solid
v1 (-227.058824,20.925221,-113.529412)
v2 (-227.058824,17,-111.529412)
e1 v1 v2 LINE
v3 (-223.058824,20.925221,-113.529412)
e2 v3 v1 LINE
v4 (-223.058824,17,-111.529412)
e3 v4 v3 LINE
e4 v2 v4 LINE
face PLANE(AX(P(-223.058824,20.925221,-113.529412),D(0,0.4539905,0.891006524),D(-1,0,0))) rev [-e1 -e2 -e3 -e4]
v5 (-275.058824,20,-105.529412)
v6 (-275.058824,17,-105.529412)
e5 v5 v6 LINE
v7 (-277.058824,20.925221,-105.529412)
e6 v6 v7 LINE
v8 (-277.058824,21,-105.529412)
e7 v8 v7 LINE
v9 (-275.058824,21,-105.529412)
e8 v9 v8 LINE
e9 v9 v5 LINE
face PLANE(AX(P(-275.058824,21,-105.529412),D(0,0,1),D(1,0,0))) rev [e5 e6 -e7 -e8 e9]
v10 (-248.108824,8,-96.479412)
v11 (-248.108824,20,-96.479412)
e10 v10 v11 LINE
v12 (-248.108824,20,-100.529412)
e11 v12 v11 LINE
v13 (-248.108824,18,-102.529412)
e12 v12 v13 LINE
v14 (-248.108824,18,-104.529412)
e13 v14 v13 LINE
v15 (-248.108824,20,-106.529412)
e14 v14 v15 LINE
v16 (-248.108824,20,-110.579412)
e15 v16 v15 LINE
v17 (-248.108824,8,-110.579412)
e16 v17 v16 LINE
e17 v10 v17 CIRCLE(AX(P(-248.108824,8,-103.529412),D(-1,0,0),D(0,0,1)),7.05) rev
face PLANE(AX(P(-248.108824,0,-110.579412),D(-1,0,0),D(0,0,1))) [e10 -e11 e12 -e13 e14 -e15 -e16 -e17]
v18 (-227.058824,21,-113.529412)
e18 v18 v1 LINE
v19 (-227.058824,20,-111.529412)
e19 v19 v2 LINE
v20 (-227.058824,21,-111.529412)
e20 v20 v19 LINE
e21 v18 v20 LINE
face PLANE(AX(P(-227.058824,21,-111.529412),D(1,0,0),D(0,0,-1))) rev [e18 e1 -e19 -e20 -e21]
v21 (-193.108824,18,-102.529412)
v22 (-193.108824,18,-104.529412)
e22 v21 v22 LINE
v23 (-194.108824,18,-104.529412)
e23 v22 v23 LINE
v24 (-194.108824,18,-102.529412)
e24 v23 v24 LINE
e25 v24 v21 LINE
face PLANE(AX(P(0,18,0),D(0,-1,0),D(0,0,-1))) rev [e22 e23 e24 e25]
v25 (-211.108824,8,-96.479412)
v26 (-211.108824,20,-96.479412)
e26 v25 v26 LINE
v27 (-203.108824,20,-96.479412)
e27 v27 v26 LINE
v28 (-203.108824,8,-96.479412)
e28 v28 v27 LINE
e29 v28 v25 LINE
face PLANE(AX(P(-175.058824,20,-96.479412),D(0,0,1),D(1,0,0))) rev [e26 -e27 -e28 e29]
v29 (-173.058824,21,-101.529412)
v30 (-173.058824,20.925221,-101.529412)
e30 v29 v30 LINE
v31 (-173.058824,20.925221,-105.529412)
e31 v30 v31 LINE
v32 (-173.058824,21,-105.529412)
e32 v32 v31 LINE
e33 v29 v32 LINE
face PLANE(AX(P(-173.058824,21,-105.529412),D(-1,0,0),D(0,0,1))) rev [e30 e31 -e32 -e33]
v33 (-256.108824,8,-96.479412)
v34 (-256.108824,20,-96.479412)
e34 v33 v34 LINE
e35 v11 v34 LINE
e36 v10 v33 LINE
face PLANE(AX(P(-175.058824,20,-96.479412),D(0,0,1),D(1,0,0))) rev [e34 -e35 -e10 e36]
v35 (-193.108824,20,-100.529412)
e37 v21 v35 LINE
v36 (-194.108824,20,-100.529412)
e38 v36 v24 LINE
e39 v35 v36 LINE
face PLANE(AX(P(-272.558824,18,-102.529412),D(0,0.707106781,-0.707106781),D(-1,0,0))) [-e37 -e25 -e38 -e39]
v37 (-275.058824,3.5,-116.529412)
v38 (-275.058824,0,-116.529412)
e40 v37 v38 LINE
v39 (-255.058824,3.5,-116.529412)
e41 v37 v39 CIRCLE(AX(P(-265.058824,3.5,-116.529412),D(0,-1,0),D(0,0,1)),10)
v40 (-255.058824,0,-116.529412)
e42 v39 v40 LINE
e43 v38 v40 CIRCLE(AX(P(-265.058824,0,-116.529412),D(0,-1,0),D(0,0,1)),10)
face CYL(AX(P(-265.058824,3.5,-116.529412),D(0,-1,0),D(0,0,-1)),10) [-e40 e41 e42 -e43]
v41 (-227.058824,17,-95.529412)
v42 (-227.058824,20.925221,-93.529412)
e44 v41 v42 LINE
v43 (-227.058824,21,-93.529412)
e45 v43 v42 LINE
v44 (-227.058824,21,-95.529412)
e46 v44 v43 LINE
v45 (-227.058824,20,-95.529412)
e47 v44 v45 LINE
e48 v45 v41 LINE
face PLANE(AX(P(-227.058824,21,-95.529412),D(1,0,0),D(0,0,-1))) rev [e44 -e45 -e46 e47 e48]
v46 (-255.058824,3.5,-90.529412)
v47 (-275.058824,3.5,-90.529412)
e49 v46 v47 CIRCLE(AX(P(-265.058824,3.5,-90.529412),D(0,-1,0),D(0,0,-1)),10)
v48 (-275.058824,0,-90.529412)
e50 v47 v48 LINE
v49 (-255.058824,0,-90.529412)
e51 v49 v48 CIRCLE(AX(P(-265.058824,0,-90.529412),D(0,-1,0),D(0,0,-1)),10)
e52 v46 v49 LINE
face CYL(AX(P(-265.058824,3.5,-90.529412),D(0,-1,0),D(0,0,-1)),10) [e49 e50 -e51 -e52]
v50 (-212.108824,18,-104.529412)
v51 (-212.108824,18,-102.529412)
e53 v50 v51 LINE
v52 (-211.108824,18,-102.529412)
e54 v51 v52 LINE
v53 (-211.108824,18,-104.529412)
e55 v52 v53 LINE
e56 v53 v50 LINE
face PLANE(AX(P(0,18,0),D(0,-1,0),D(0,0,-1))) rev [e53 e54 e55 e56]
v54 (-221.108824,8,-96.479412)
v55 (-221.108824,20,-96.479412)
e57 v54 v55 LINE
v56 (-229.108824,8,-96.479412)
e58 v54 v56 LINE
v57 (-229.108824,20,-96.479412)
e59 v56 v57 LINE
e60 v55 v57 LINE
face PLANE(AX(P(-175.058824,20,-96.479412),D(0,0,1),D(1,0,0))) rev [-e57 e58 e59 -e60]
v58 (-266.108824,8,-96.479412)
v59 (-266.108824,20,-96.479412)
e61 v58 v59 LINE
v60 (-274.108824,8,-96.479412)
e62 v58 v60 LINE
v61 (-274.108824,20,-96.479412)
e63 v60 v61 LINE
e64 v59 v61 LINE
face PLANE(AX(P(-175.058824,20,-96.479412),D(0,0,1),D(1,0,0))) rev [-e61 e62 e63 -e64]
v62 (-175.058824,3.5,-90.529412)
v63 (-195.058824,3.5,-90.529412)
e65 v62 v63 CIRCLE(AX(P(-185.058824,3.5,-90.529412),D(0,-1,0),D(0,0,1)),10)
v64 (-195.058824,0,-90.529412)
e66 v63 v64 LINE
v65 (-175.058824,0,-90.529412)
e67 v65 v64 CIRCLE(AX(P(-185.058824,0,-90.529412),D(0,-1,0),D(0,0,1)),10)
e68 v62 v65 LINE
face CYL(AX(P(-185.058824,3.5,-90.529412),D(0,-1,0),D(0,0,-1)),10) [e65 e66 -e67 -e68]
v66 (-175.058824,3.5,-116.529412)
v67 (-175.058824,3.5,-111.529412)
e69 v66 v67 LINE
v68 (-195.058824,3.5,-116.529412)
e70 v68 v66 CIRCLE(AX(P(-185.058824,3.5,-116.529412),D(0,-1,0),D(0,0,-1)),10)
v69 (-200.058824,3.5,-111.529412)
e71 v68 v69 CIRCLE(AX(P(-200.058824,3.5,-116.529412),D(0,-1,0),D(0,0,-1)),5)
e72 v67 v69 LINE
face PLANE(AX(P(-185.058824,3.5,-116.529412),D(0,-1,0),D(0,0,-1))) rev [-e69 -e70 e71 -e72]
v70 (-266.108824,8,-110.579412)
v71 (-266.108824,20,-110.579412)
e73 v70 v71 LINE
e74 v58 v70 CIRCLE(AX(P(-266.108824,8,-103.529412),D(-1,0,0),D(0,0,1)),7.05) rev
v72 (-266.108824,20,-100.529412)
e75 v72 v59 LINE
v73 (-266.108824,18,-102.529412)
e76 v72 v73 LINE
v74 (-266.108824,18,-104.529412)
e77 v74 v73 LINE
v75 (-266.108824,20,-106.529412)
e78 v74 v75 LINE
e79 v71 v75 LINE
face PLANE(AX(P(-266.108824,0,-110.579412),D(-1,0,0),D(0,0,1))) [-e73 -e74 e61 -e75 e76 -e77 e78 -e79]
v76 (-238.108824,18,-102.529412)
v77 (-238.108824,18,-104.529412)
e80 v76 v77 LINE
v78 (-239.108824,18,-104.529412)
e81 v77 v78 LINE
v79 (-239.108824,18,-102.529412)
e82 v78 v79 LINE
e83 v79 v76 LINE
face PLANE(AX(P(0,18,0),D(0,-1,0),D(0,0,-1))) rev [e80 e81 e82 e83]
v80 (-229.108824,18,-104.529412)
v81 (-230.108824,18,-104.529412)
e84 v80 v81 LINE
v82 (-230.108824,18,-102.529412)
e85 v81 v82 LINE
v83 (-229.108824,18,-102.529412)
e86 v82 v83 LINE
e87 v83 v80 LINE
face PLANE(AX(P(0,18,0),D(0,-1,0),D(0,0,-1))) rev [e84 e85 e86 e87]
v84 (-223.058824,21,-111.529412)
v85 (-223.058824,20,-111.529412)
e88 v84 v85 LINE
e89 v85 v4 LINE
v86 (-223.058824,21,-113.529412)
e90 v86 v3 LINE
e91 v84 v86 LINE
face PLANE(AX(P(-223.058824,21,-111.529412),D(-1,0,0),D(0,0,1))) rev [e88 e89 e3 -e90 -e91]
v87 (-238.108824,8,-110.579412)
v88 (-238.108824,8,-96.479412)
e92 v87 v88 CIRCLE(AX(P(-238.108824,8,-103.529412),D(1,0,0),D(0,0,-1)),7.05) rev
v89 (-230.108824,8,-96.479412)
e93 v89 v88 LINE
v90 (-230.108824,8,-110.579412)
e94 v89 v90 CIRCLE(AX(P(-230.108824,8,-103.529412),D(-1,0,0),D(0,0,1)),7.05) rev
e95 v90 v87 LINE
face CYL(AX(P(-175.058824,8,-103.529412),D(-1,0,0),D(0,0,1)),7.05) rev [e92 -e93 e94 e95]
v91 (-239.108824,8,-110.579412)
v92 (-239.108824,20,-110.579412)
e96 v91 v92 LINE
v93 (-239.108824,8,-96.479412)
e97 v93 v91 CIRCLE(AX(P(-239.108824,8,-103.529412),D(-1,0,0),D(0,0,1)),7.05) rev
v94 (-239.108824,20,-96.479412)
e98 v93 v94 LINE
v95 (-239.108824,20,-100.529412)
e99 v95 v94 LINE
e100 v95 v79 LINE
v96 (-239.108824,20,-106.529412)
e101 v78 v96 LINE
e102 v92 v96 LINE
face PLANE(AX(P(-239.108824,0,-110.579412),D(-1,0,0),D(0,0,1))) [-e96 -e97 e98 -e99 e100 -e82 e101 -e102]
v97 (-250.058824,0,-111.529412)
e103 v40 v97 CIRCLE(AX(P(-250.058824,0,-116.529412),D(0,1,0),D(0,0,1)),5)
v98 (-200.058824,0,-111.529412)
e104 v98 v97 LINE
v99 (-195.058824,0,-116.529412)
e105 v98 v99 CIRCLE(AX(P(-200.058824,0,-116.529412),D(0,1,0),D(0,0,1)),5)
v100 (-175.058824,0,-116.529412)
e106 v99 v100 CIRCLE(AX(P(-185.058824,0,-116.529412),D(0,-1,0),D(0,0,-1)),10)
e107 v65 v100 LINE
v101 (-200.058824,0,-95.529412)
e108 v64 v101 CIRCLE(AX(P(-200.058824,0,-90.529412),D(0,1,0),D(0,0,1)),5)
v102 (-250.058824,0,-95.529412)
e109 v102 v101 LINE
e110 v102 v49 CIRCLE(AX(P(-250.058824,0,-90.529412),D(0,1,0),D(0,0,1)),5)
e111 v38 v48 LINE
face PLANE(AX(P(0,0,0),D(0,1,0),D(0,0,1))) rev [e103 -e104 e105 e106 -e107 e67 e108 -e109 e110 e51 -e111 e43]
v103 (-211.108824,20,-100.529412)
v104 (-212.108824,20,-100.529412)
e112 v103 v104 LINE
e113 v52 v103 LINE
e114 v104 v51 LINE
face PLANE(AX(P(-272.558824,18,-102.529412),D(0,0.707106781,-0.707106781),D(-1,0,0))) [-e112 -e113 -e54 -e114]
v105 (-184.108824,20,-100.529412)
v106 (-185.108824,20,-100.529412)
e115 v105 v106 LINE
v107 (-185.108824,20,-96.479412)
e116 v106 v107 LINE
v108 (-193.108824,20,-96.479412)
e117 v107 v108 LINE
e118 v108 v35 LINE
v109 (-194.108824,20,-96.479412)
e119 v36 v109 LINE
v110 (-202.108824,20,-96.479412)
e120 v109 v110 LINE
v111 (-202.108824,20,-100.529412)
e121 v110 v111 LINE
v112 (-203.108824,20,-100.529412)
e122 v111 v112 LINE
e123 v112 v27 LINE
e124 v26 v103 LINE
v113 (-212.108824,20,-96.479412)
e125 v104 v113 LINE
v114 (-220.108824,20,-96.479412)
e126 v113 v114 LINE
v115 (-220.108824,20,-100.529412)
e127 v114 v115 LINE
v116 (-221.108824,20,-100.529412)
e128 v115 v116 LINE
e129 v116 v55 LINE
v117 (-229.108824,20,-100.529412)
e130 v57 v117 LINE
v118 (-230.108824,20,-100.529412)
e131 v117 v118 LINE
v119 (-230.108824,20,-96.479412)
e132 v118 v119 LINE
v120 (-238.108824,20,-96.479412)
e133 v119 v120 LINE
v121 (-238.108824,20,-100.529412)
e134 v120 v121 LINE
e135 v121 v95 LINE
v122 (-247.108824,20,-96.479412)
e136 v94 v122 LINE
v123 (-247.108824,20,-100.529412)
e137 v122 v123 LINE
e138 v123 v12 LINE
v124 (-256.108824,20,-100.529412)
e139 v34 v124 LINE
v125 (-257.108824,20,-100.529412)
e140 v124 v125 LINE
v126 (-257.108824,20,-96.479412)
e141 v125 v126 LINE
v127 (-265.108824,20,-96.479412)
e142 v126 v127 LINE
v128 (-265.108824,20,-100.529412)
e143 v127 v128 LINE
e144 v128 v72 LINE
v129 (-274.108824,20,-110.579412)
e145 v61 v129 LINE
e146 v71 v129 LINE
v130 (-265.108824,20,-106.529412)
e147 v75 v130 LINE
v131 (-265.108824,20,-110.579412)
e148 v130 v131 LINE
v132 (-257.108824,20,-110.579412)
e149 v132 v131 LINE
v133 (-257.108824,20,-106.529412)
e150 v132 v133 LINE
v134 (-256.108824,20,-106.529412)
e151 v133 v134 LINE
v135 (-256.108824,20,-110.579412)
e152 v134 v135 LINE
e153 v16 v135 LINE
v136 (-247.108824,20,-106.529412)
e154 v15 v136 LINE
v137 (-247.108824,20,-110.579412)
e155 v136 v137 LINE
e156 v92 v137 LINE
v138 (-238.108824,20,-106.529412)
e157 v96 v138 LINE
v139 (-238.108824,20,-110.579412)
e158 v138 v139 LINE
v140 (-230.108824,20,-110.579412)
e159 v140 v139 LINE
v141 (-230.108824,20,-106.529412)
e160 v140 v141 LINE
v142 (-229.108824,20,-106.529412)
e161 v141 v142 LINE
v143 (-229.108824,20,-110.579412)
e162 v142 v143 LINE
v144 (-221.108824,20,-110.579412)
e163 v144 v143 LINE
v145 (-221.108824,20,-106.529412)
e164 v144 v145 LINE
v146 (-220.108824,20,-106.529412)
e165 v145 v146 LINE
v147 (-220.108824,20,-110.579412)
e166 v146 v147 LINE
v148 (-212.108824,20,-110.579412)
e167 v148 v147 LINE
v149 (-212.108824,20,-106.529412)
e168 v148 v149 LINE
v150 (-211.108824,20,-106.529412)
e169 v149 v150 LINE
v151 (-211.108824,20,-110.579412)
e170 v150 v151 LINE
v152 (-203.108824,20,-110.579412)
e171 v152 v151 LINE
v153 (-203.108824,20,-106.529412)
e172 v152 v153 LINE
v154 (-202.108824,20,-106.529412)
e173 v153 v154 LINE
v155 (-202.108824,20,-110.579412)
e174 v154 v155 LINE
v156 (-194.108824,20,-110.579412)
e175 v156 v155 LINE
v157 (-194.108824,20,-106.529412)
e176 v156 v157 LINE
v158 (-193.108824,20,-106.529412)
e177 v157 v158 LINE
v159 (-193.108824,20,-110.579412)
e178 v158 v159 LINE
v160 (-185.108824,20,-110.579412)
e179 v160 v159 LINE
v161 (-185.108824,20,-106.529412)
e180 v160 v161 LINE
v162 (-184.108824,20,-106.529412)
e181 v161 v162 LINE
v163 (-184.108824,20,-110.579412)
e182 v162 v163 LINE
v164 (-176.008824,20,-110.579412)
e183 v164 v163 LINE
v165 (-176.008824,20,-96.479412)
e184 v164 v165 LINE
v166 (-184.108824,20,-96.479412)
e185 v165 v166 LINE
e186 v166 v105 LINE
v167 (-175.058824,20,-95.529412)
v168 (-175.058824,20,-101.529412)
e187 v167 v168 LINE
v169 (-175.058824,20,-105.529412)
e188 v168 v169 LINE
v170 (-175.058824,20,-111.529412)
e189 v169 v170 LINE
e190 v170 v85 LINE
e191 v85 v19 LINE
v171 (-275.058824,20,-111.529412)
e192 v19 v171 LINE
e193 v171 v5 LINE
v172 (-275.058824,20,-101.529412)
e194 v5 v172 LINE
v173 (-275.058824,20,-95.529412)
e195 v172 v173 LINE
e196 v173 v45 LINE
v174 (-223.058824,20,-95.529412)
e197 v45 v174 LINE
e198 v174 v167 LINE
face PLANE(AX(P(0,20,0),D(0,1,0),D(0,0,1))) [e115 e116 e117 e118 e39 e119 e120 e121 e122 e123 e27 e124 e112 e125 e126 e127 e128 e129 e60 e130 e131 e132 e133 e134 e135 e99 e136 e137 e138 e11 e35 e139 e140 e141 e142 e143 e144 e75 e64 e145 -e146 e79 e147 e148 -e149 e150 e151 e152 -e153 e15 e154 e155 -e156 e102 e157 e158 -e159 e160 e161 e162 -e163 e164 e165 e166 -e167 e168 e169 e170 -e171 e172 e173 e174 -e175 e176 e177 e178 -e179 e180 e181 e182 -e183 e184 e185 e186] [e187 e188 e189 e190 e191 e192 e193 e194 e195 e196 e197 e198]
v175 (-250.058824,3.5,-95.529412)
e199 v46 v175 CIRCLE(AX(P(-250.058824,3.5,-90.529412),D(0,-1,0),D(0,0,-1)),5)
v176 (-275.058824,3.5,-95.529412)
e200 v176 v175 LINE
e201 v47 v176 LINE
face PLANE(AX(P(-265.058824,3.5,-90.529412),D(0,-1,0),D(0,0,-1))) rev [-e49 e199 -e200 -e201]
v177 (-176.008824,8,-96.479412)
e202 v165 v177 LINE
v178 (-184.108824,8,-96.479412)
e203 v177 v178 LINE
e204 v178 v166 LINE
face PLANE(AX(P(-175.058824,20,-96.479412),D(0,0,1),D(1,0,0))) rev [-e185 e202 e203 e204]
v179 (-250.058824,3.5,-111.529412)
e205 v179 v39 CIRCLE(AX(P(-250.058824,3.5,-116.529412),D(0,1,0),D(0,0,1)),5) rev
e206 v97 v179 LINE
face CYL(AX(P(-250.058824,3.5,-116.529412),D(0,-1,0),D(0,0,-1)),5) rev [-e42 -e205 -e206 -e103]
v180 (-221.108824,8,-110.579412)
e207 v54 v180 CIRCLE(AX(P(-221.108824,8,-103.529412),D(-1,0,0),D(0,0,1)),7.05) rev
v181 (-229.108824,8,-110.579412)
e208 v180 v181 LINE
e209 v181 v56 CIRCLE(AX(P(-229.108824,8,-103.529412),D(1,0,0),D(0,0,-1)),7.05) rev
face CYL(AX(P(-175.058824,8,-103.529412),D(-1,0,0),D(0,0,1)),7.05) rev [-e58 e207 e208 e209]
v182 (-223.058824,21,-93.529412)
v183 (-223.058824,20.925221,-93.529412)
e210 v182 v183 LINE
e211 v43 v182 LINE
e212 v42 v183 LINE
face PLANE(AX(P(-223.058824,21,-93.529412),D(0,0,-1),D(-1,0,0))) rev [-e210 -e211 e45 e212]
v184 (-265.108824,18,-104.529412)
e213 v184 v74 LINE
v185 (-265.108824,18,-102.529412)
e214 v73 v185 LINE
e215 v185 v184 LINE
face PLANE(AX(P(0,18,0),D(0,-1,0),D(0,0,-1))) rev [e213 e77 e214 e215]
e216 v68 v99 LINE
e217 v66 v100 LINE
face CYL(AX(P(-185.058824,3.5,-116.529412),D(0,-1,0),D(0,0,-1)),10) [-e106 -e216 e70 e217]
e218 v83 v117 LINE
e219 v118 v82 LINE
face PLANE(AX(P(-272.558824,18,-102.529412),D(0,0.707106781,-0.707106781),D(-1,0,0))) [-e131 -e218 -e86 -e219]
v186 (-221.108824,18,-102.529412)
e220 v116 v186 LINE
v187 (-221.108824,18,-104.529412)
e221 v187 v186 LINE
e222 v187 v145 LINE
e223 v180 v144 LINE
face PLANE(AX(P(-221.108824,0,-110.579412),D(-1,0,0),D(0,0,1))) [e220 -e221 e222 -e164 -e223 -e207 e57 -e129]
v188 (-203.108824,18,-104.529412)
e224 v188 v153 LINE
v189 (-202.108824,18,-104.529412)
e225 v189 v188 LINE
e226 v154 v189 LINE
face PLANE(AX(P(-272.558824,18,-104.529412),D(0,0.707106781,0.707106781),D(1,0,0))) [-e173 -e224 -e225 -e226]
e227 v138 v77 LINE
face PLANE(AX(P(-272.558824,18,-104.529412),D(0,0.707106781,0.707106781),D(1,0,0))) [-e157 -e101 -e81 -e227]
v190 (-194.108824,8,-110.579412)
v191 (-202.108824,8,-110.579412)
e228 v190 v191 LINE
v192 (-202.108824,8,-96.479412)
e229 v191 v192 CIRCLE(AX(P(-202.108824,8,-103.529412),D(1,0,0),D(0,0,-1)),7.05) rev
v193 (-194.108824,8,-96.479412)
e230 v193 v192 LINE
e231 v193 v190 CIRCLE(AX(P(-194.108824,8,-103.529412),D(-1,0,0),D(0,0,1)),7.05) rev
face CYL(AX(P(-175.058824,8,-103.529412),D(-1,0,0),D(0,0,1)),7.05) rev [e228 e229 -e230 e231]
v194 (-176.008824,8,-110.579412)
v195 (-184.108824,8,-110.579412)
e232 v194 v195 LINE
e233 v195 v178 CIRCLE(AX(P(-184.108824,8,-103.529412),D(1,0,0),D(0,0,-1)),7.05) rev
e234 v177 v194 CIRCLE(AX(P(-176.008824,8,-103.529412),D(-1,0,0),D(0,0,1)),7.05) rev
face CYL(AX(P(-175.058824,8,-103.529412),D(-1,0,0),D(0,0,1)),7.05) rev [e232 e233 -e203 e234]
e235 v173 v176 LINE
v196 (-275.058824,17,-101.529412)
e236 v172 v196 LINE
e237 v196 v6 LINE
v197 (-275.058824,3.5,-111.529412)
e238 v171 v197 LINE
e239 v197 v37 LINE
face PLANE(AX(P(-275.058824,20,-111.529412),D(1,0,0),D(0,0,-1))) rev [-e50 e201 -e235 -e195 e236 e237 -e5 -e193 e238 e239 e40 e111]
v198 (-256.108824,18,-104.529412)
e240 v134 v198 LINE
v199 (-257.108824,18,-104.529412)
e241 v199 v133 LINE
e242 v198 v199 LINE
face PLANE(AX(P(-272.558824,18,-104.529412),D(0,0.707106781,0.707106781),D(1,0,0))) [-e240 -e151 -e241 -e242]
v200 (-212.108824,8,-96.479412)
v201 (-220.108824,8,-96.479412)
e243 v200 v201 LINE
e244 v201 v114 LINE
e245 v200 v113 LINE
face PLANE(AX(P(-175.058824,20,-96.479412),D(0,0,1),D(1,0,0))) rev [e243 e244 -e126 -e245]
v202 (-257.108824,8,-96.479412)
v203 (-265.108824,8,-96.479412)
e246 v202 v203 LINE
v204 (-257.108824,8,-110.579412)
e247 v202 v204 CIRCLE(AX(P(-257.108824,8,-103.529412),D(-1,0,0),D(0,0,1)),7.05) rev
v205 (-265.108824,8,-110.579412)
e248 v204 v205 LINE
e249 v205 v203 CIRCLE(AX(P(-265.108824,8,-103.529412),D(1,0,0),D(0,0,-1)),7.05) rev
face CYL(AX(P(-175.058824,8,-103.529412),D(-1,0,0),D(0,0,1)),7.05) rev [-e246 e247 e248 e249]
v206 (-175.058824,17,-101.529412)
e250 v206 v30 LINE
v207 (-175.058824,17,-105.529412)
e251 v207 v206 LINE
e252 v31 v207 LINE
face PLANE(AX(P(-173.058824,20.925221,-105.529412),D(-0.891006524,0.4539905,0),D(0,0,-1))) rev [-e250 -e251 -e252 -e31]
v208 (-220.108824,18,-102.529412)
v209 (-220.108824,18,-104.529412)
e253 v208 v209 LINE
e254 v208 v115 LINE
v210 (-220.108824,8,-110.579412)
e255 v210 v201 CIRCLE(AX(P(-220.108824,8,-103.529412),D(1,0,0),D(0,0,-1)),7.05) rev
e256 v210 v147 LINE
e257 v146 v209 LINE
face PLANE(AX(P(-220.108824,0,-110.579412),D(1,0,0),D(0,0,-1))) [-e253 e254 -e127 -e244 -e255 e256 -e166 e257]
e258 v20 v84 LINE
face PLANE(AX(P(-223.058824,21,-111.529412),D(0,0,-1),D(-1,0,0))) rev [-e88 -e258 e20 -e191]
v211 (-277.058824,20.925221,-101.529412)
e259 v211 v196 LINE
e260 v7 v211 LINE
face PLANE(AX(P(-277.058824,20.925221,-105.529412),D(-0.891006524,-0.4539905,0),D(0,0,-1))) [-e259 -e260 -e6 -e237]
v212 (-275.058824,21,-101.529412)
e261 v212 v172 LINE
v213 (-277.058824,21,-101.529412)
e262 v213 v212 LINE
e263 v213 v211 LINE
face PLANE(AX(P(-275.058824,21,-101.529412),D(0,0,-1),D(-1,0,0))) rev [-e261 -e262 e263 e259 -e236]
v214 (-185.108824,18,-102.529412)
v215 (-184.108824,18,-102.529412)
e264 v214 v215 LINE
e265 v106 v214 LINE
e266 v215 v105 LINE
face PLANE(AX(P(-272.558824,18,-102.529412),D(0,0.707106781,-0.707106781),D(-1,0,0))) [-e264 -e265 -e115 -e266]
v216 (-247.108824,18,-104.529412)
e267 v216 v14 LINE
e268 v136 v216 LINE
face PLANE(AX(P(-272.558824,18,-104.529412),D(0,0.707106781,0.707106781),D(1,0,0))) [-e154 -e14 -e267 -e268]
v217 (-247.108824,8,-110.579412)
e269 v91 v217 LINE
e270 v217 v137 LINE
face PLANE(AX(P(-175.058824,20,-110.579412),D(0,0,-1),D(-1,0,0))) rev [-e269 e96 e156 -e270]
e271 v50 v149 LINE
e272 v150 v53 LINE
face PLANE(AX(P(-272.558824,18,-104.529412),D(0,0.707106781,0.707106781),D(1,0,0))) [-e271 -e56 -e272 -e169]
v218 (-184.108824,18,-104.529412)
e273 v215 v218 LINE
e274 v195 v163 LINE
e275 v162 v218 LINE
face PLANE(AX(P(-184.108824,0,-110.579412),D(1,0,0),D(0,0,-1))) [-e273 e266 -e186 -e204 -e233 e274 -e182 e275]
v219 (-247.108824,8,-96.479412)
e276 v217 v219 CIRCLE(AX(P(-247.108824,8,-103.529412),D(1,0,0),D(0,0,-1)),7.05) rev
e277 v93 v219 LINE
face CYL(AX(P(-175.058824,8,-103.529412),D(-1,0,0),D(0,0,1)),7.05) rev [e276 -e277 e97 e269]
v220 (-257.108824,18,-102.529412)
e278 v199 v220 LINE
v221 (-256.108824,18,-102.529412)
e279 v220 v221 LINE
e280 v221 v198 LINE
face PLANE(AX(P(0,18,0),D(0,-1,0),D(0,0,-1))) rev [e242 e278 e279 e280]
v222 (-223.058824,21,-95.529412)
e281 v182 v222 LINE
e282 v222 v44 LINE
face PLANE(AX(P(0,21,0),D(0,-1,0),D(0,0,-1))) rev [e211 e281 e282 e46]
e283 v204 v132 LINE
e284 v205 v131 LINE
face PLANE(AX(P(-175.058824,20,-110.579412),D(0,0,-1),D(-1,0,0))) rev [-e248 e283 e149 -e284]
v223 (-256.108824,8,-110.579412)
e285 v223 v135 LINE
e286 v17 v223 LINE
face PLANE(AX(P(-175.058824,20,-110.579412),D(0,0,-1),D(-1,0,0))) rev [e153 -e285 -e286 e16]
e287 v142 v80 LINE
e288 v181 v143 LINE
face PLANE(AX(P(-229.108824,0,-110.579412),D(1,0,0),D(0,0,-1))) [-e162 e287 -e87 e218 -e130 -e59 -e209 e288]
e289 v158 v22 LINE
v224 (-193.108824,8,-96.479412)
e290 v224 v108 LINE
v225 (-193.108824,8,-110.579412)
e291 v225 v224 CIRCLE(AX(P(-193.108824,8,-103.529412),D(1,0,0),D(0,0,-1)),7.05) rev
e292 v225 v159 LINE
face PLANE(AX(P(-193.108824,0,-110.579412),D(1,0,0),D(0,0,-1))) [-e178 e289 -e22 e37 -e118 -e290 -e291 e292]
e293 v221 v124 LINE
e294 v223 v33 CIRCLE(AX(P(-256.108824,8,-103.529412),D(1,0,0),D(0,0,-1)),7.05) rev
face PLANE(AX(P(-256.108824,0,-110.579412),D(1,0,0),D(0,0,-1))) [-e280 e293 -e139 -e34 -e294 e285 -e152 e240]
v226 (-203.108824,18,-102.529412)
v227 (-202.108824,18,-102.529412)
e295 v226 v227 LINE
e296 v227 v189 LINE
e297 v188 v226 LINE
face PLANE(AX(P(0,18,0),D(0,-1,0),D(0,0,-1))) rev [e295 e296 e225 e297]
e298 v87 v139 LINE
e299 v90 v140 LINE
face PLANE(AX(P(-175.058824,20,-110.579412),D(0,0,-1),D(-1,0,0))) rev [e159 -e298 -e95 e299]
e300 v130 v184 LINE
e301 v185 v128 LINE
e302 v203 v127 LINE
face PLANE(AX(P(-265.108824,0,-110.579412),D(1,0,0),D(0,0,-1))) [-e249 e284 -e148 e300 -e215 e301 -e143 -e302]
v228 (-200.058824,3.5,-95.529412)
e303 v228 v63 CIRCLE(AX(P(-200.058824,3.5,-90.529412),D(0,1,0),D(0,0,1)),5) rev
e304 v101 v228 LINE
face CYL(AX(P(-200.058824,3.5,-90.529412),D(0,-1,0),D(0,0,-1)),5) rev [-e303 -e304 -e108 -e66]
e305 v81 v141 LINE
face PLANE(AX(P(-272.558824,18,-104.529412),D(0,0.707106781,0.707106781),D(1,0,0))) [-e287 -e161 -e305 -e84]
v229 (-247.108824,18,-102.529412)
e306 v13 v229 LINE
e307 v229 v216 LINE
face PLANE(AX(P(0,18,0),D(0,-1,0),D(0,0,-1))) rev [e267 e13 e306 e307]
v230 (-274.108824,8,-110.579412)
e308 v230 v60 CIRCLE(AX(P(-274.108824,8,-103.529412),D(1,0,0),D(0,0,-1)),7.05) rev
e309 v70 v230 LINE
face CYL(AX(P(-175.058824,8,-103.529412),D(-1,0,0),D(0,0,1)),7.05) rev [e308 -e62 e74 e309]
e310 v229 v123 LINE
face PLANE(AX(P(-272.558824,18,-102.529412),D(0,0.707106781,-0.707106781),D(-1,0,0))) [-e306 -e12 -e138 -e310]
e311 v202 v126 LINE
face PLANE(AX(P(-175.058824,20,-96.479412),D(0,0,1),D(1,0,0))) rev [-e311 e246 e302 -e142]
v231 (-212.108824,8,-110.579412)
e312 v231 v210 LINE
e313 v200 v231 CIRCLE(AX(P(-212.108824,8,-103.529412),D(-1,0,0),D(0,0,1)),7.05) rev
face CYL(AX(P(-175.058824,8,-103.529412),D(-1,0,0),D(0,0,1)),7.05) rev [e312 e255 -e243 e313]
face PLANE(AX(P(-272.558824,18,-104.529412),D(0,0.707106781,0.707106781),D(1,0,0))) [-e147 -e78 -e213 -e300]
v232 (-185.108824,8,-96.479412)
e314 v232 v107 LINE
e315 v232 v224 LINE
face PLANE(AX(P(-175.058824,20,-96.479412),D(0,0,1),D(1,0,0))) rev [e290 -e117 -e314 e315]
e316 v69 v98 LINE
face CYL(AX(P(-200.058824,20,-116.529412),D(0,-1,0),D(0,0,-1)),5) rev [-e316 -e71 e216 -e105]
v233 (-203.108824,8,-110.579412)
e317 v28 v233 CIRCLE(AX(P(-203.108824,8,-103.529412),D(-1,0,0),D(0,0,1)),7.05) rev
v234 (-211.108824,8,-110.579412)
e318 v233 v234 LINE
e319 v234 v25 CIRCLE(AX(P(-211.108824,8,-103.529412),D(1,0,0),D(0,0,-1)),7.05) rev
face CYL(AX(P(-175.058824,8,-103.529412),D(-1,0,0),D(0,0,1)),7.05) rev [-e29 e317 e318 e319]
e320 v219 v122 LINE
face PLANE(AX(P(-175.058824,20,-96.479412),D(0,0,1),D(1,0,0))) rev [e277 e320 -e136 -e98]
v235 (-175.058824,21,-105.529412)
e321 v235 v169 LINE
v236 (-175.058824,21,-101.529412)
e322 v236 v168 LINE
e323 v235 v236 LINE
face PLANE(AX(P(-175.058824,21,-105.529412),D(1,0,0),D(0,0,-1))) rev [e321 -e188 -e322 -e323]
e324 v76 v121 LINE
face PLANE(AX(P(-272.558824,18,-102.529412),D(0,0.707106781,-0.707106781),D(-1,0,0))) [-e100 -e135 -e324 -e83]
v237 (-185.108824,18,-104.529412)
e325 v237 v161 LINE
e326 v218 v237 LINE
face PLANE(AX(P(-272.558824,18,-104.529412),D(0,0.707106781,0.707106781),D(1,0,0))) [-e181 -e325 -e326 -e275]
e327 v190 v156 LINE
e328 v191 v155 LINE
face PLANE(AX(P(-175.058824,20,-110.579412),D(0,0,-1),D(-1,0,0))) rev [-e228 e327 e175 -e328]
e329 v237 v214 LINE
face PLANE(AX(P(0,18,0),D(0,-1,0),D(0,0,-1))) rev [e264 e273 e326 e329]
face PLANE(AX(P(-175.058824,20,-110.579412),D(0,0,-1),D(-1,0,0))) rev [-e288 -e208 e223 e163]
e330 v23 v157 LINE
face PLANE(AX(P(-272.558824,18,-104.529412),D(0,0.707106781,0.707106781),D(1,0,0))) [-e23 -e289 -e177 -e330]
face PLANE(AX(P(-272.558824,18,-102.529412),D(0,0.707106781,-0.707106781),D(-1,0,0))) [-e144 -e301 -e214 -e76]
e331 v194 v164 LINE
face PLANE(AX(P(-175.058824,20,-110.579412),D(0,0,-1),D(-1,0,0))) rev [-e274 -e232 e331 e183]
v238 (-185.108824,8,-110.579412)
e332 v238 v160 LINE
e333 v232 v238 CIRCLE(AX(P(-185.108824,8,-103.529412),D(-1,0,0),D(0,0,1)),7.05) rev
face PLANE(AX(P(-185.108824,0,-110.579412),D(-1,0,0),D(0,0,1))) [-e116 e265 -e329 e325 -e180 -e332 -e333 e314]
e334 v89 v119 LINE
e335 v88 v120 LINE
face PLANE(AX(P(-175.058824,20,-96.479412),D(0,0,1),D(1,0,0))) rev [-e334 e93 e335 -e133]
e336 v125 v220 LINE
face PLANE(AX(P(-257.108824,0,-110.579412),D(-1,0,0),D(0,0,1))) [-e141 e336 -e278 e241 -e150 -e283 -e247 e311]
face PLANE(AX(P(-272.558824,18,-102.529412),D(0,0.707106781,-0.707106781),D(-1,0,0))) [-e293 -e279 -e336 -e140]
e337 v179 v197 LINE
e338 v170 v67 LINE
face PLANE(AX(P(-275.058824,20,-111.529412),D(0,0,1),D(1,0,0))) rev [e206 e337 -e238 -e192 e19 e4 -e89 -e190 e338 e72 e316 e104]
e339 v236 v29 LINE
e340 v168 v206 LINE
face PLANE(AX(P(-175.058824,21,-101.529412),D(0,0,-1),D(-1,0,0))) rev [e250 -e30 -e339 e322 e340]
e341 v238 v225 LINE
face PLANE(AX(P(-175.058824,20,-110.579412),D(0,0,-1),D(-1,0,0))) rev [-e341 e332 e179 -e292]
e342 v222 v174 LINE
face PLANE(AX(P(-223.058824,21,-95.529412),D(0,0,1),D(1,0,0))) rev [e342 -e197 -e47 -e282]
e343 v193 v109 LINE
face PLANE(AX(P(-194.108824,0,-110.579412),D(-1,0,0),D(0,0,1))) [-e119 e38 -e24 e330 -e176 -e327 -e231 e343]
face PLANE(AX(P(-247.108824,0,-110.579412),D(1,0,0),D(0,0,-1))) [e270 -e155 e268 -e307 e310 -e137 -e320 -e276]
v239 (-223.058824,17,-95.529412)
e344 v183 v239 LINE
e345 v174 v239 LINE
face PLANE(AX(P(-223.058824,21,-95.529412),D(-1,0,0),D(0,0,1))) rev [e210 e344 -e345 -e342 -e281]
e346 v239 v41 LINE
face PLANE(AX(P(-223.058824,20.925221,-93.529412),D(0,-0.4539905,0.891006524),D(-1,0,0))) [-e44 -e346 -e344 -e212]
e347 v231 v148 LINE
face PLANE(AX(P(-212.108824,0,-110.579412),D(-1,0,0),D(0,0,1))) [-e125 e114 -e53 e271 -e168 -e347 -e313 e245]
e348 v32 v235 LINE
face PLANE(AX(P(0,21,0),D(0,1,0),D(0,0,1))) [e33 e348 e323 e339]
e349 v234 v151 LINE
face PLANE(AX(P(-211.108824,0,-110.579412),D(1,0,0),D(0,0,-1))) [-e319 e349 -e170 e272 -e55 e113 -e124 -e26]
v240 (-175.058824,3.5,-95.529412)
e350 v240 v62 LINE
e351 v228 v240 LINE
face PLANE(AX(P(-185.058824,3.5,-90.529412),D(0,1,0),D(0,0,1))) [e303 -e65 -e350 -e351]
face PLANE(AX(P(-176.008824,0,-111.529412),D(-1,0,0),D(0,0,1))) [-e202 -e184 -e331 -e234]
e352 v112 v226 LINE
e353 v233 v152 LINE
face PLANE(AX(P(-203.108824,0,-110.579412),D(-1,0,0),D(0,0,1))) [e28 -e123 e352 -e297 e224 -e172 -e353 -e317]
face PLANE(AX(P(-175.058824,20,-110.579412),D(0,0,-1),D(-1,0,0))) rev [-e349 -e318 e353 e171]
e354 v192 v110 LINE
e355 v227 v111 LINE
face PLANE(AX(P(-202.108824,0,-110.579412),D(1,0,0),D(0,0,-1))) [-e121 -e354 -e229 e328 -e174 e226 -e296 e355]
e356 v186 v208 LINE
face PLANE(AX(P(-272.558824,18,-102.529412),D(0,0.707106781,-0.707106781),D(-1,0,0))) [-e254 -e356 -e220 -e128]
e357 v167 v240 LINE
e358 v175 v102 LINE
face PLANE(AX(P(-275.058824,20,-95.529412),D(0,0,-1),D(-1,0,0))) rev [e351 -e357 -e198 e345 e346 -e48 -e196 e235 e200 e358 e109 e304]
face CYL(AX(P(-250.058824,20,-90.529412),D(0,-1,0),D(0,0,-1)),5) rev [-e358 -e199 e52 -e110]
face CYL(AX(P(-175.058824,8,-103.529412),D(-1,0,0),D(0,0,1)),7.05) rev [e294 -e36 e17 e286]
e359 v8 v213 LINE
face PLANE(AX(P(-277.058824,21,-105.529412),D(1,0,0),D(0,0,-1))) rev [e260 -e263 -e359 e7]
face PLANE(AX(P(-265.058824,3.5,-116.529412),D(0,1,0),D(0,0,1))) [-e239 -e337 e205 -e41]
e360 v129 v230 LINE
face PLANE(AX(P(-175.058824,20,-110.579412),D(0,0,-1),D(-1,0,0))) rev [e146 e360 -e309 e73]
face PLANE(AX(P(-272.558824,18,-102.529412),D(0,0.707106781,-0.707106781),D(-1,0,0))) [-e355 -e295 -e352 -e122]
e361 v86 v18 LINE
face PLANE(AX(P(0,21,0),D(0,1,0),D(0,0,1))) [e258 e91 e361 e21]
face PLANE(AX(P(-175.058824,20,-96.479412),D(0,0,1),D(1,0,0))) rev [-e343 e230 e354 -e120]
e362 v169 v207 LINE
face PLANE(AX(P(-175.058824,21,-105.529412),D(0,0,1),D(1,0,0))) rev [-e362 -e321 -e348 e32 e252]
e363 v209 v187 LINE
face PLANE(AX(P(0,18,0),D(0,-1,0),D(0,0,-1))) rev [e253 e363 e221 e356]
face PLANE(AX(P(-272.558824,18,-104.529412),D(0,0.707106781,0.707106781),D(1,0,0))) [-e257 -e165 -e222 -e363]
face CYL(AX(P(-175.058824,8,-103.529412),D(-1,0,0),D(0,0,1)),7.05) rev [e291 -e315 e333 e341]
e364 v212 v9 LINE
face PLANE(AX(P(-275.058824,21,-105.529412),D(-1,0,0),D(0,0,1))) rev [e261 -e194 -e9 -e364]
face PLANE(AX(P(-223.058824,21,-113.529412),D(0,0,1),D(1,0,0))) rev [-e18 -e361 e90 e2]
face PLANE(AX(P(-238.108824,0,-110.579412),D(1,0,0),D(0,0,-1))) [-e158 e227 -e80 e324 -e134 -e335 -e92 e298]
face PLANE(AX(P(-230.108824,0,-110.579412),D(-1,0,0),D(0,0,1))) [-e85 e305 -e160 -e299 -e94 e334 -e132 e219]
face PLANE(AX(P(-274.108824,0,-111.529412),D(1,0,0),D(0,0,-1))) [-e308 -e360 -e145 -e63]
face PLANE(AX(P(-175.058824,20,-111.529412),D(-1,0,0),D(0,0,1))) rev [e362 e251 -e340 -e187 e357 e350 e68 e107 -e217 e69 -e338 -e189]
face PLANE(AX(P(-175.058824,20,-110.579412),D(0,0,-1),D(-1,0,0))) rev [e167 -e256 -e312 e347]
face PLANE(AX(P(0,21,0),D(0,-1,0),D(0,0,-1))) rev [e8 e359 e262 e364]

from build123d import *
from OCP.BRepFilletAPI import BRepFilletAPI_MakeChamfer

# Parameters (mm, degrees)
SKETCH1_W           = 100
SKETCH1_H           = 16
BOSS_EXTRUDE1_DEPTH = 20
CUT_EXTRUDE2_DEPTH  = 100
SKETCH3_W           = 0.95
SKETCH3_H           = 16
BOSS_EXTRUDE2_DEPTH = 20
SKETCH4_W           = 1
SKETCH4_H           = 14.1
BOSS_EXTRUDE3_DEPTH = 20
SKETCH5_W           = 95
SKETCH5_H           = 2
CUT_EXTRUDE3_DEPTH  = 2
BOSS_EXTRUDE4_DEPTH = 3.5
FILLET1_R           = 5
FILLET2_SIZE        = 2
SKETCH9_W           = 2
SKETCH9_H           = 4
SKETCH9_W_2         = 4
SKETCH9_H_2         = 2
BOSS_EXTRUDE5_DEPTH = 4
CHAMFER1_SIZE       = 2
CHAMFER1_SIZE_2     = 3.925221011


with BuildPart() as part:
    # Sketch1 → Boss-Extrude1 (new body)
    with BuildSketch(Plane(origin=(0, 0, 0), x_dir=(1, 0, 0), z_dir=(0, 1, 0))):
        with Locations((-225.058823529, 103.529411765)):
            Rectangle(SKETCH1_W, SKETCH1_H)
    extrude(amount=BOSS_EXTRUDE1_DEPTH)

    # Sketch2 → Cut-Extrude2 (cut)
    with BuildSketch(Plane.ZY.offset(275.058823529)):
        with BuildLine():
            Line((-110.579411765, 20), (-96.479411765, 20))
            Line((-96.479411765, 20), (-96.479411765, 8))
            ThreePointArc((-96.479411765, 8), (-103.529411765, 0.95), (-110.579411765, 8))
            Line((-110.579411765, 8), (-110.579411765, 20))
        make_face()
    extrude(amount=-CUT_EXTRUDE2_DEPTH, mode=Mode.SUBTRACT)

    # Sketch3 → Boss-Extrude2 (add)
    with BuildSketch(Plane(origin=(0, 20, 0), x_dir=(1, 0, 0), z_dir=(0, 1, 0))):
        with Locations((-175.533823529, 103.529411765)):
            Rectangle(SKETCH3_W, SKETCH3_H)
        with Locations((-274.583823529, 103.529411765)):
            Rectangle(SKETCH3_W, SKETCH3_H)
    extrude(amount=-BOSS_EXTRUDE2_DEPTH)

    # Sketch4 → Boss-Extrude3 (add)
    with BuildSketch(Plane(origin=(0, 20, 0), x_dir=(1, 0, 0), z_dir=(0, 1, 0))):
        with Locations((-265.608823529, 103.529411765)):
            Rectangle(SKETCH4_W, SKETCH4_H)
        with Locations((-256.608823529, 103.529411765)):
            Rectangle(SKETCH4_W, SKETCH4_H)
        with Locations((-247.608823529, 103.529411765)):
            Rectangle(SKETCH4_W, SKETCH4_H)
        with Locations((-238.608823529, 103.529411765)):
            Rectangle(SKETCH4_W, SKETCH4_H)
        with Locations((-229.608823529, 103.529411765)):
            Rectangle(SKETCH4_W, SKETCH4_H)
        with Locations((-220.608823529, 103.529411765)):
            Rectangle(SKETCH4_W, SKETCH4_H)
        with Locations((-211.608823529, 103.529411765)):
            Rectangle(SKETCH4_W, SKETCH4_H)
        with Locations((-202.608823529, 103.529411765)):
            Rectangle(SKETCH4_W, SKETCH4_H)
        with Locations((-193.608823529, 103.529411765)):
            Rectangle(SKETCH4_W, SKETCH4_H)
        with Locations((-184.608823529, 103.529411765)):
            Rectangle(SKETCH4_W, SKETCH4_H)
    extrude(amount=-BOSS_EXTRUDE3_DEPTH)

    # Sketch5 → Cut-Extrude3 (cut)
    with BuildSketch(Plane(origin=(0, 20, 0), x_dir=(1, 0, 0), z_dir=(0, 1, 0))):
        with Locations((-225.058823529, 103.529411765)):
            Rectangle(SKETCH5_W, SKETCH5_H)
    extrude(amount=-CUT_EXTRUDE3_DEPTH, mode=Mode.SUBTRACT)

    # Sketch6 → Boss-Extrude4 (add)
    with BuildSketch(Plane.XZ):
        with BuildLine():
            Line((-275.058823529, -90.529411765), (-275.058823529, -95.529411765))
            Line((-275.058823529, -95.529411765), (-255.058823529, -95.529411765))
            Line((-255.058823529, -95.529411765), (-255.058823529, -90.529411765))
            ThreePointArc((-255.058823529, -90.529411765), (-265.058823529, -80.529411765), (-275.058823529, -90.529411765))
        make_face()
        with BuildLine():
            Line((-175.058823529, -111.529411765), (-175.058823529, -116.529411765))
            ThreePointArc((-175.058823529, -116.529411765), (-185.058823529, -126.529411765), (-195.058823529, -116.529411765))
            Line((-195.058823529, -116.529411765), (-195.058823529, -111.529411765))
            Line((-195.058823529, -111.529411765), (-175.058823529, -111.529411765))
        make_face()
        with BuildLine():
            Line((-195.058823529, -90.529411765), (-195.058823529, -95.529411765))
            Line((-195.058823529, -95.529411765), (-175.058823529, -95.529411765))
            Line((-175.058823529, -95.529411765), (-175.058823529, -90.529411765))
            ThreePointArc((-175.058823529, -90.529411765), (-185.058823529, -80.529411765), (-195.058823529, -90.529411765))
        make_face()
        with BuildLine():
            Line((-275.058823529, -111.529411765), (-255.058823529, -111.529411765))
            Line((-255.058823529, -111.529411765), (-255.058823529, -116.529411765))
            ThreePointArc((-255.058823529, -116.529411765), (-265.058823529, -126.529411765), (-275.058823529, -116.529411765))
            Line((-275.058823529, -116.529411765), (-275.058823529, -111.529411765))
        make_face()
    extrude(amount=-BOSS_EXTRUDE4_DEPTH)

    # Fillet1
    fillet1_edges = [part.edges().sort_by_distance(p)[0] for p in [
        (-195.058823529, 1.75, -95.529411765),
        (-255.058823529, 1.75, -95.529411765),
        (-255.058823529, 1.75, -111.529411765),
        (-195.058823529, 1.75, -111.529411765),
    ]]
    fillet(fillet1_edges, radius=FILLET1_R - 0.0001)  # a hair under: the kernel refuses the full size

    # Fillet2
    fillet2_edges = [part.edges().sort_by_distance(p)[0] for p in [
        (-238.608823529, 20, -102.529411765),
        (-238.608823529, 20, -104.529411765),
        (-202.608823529, 20, -102.529411765),
        (-202.608823529, 20, -104.529411765),
        (-184.608823529, 20, -102.529411765),
        (-184.608823529, 20, -104.529411765),
        (-193.608823529, 20, -102.529411765),
        (-193.608823529, 20, -104.529411765),
        (-211.608823529, 20, -104.529411765),
        (-211.608823529, 20, -102.529411765),
        (-220.608823529, 20, -102.529411765),
        (-220.608823529, 20, -104.529411765),
        (-229.608823529, 20, -102.529411765),
        (-229.608823529, 20, -104.529411765),
        (-247.608823529, 20, -104.529411765),
        (-247.608823529, 20, -102.529411765),
        (-256.608823529, 20, -104.529411765),
        (-256.608823529, 20, -102.529411765),
        (-265.608823529, 20, -104.529411765),
        (-265.608823529, 20, -102.529411765),
    ]]
    chamfer(fillet2_edges, length=FILLET2_SIZE - 0.0001)  # a hair under: the kernel refuses the full size

    # Sketch9 → Boss-Extrude5 (add)
    with BuildSketch(Plane(origin=(0, 17, 0), x_dir=(-1, 0, 0), z_dir=(0, 1, 0))):
        with Locations((174.058823529, -103.529411765)):
            Rectangle(SKETCH9_W, SKETCH9_H)
        with Locations((276.058823529, -103.529411765)):
            Rectangle(SKETCH9_W, SKETCH9_H)
        with Locations((225.058823529, -112.529411765)):
            Rectangle(SKETCH9_W_2, SKETCH9_H_2)
        with Locations((225.058823529, -94.529411765)):
            Rectangle(SKETCH9_W_2, SKETCH9_H_2)
    extrude(amount=BOSS_EXTRUDE5_DEPTH)

    # Chamfer1
    chamfer1_edges_1 = [part.edges().sort_by_distance(p)[0] for p in [
        (-225.058823529, 17, -113.529411765),
    ]]
    chamfer1_side_1 = [part.faces().sort_by_distance(p)[0] for p in [
        (-225.058823529, 17, -113.489411765),
    ]]
    chamfer1_edges_2 = [part.edges().sort_by_distance(p)[0] for p in [
        (-173.058823529, 17, -103.529411765),
    ]]
    chamfer1_side_2 = [part.faces().sort_by_distance(p)[0] for p in [
        (-173.098823529, 17, -103.529411765),
    ]]
    chamfer1_edges_3 = [part.edges().sort_by_distance(p)[0] for p in [
        (-225.058823529, 17, -93.529411765),
    ]]
    chamfer1_side_3 = [part.faces().sort_by_distance(p)[0] for p in [
        (-225.058823529, 17, -93.569411765),
    ]]
    chamfer1_edges_4 = [part.edges().sort_by_distance(p)[0] for p in [
        (-277.058823529, 17, -103.529411765),
    ]]
    chamfer1_side_4 = [part.faces().sort_by_distance(p)[0] for p in [
        (-277.018823529, 17, -103.529411765),
    ]]
    chamfer1 = BRepFilletAPI_MakeChamfer(part.part.solid().wrapped)
    for e in chamfer1_edges_1:
        chamfer1.Add(CHAMFER1_SIZE - 0.0001, CHAMFER1_SIZE_2 - 0.0001, e.wrapped, chamfer1_side_1[0].wrapped)
    for e in chamfer1_edges_2:
        chamfer1.Add(CHAMFER1_SIZE - 0.0001, CHAMFER1_SIZE_2 - 0.0001, e.wrapped, chamfer1_side_2[0].wrapped)
    for e in chamfer1_edges_3:
        chamfer1.Add(CHAMFER1_SIZE - 0.0001, CHAMFER1_SIZE_2 - 0.0001, e.wrapped, chamfer1_side_3[0].wrapped)
    for e in chamfer1_edges_4:
        chamfer1.Add(CHAMFER1_SIZE - 0.0001, CHAMFER1_SIZE_2 - 0.0001, e.wrapped, chamfer1_side_4[0].wrapped)
    add(Compound.cast(chamfer1.Shape()), mode=Mode.REPLACE)  # a hair under: the kernel refuses the full size


solid = part.part
